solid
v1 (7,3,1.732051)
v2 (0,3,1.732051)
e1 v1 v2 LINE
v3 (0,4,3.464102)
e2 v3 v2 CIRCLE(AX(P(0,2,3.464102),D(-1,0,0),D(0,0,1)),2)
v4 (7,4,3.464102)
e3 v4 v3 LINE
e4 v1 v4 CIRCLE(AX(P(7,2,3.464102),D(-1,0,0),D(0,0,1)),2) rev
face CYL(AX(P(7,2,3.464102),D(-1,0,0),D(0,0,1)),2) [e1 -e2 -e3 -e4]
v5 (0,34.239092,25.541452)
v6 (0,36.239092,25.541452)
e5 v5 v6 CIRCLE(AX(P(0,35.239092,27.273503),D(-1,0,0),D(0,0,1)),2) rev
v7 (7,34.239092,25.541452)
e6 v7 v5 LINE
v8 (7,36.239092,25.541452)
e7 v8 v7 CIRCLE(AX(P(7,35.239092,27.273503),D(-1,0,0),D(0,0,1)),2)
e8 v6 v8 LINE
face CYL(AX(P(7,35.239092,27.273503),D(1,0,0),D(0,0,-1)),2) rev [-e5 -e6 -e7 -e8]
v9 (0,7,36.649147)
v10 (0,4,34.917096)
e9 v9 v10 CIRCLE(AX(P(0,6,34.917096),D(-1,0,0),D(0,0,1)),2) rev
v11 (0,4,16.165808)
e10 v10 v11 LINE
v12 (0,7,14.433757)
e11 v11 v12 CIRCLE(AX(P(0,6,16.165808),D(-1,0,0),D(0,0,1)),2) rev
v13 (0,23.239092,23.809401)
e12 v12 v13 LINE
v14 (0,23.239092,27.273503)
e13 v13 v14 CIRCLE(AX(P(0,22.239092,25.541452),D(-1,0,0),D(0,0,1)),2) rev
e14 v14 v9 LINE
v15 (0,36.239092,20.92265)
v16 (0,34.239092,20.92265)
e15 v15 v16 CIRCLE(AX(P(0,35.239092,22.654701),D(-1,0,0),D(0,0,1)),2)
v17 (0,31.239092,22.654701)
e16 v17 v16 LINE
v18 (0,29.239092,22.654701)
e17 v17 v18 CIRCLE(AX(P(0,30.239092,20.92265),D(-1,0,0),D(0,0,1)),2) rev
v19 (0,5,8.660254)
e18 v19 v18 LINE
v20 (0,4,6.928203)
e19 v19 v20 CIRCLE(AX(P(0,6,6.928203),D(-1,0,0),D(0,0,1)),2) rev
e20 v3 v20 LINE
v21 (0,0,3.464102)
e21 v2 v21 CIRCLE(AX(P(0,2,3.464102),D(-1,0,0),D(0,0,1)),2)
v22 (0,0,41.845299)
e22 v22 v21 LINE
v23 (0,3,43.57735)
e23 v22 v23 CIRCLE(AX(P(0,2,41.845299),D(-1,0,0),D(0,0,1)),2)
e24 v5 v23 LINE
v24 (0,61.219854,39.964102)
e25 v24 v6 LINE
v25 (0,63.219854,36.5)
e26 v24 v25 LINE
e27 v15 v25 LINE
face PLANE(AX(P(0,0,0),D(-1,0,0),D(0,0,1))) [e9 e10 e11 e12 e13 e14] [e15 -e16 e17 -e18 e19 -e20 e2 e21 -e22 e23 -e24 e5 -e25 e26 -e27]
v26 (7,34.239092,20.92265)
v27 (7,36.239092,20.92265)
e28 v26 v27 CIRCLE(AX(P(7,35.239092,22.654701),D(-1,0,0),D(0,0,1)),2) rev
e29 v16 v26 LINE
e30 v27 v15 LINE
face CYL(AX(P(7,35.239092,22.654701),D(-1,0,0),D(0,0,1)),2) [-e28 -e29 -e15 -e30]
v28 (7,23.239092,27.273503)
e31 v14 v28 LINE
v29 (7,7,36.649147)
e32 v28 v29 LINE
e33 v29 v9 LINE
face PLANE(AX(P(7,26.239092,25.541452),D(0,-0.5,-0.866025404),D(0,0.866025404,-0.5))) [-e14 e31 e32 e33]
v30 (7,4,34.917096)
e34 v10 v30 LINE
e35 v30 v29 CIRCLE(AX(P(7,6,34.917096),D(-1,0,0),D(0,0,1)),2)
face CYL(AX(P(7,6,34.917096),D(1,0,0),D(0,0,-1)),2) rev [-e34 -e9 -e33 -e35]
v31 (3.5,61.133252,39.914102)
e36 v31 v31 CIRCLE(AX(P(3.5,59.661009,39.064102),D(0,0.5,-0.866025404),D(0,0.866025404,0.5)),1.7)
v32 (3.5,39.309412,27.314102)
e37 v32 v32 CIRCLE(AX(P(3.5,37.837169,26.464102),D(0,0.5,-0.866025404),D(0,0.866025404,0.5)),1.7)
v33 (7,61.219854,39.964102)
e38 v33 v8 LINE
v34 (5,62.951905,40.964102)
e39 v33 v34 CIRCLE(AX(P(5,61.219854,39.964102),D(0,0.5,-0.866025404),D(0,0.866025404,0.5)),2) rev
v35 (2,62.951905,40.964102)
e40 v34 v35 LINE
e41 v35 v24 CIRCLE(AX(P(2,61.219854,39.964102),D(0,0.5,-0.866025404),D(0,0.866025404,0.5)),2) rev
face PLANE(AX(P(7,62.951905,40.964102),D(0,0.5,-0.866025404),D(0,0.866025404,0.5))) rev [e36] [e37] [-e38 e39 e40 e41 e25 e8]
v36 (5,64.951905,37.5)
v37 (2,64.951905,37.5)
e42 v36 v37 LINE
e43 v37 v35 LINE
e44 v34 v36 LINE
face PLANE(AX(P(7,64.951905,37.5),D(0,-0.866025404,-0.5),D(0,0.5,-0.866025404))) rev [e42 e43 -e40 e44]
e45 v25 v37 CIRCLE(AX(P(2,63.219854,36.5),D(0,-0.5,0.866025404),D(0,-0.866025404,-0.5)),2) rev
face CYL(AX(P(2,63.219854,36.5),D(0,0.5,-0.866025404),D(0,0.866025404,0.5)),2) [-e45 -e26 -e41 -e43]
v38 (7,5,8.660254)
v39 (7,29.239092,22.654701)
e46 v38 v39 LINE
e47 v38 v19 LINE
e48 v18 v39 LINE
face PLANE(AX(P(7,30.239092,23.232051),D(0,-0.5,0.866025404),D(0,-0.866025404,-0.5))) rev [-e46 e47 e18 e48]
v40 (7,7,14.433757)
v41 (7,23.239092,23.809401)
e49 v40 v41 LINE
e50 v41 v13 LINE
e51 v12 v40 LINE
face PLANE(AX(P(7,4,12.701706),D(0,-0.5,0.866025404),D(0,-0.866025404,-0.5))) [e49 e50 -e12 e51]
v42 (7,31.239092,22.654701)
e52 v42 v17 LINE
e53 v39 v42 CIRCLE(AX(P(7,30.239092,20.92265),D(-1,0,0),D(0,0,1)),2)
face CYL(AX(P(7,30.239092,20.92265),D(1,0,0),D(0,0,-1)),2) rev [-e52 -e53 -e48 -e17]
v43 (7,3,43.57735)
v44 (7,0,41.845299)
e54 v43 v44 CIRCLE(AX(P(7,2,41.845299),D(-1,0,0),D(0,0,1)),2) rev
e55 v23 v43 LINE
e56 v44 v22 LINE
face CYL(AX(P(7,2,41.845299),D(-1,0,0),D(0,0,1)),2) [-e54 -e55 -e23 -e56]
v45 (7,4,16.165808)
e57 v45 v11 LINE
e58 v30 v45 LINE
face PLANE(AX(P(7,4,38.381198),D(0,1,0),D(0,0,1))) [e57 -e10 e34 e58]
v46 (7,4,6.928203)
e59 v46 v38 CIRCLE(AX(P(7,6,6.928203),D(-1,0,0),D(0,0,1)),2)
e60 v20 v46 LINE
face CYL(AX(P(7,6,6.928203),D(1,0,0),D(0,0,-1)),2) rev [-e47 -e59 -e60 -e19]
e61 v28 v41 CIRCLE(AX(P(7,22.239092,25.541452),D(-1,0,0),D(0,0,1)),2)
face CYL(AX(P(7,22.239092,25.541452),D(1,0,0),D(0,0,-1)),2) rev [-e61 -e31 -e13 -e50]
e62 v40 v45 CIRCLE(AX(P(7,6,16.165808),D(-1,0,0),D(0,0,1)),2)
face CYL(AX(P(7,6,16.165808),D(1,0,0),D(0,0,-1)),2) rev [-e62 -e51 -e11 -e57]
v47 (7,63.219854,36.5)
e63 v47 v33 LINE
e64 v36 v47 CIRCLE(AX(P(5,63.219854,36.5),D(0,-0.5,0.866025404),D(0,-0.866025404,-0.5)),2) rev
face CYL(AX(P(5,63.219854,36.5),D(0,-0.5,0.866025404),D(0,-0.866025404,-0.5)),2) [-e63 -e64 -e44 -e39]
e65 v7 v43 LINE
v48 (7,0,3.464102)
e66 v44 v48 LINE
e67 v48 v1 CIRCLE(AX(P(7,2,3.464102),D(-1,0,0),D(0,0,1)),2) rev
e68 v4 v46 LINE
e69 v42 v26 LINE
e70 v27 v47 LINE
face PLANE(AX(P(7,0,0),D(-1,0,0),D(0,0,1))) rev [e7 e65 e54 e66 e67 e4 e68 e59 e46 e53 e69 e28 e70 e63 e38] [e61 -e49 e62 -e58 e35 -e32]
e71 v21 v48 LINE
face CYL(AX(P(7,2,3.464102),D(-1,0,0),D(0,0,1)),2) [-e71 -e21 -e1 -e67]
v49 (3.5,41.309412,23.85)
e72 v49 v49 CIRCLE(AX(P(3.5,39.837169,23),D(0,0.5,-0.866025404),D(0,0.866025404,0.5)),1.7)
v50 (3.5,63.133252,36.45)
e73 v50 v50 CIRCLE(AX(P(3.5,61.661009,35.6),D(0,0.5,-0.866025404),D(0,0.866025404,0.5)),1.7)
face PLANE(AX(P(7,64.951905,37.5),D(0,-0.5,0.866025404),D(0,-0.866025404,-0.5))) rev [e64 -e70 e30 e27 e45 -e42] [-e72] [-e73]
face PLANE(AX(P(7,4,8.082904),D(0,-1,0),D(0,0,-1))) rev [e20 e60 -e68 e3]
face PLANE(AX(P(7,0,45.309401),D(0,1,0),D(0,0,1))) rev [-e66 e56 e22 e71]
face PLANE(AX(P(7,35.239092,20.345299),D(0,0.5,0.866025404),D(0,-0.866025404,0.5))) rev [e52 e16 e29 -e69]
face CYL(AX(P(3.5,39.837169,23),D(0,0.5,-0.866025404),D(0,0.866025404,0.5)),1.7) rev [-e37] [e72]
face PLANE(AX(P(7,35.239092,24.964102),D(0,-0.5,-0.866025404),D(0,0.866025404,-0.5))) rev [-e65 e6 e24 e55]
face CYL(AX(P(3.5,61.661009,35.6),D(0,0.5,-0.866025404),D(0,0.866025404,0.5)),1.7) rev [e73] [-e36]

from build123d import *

# Parameters (mm, degrees)
BOSS_EXTRU_1_DEPTH = 7
D_GAGEMENT_M31_D   = 3.4
CONG_1_R           = 2


with BuildPart() as part:
    # Esquisse1 → Boss.-Extru.1 (new body)
    with BuildSketch(Plane(origin=(0, 0, 0), x_dir=(0, 0, -1), z_dir=(1, 0, 0))):
        Polygon((-37.5, 64.951905284), (-40.964101615, 62.951905284), (-24.964101615, 35.239092363), (-45.309401077, 0), (0, 0), (-2.309401077, 4), (-8.082903769, 4), (-23.232050808, 30.239092363), (-20.345299462, 35.239092363), align=None)
        Polygon((-38.381197846, 4), (-12.701705922, 4), (-25.541451884, 26.239092363), align=None, mode=Mode.SUBTRACT)
    extrude(amount=BOSS_EXTRU_1_DEPTH)

    # Dégagement M31 (through all)
    with Locations(Plane(origin=(0, 0, 0), x_dir=(-1, 0, 0), z_dir=(0, 0.5000000000000047, -0.866025403784436))):
        with Locations((-3.5, 71.2), (-3.5, 46)):
            Hole(D_GAGEMENT_M31_D / 2)

    # Congé1
    cong_1_edges = [part.edges().sort_by_distance(p)[0] for p in [
        (0, 63.951905284, 39.232050808),
        (3.5, 0, 0),
        (3.5, 0, 45.309401077),
        (3.5, 35.239092363, 24.964101615),
        (3.5, 35.239092363, 20.345299462),
        (3.5, 30.239092363, 23.232050808),
        (3.5, 4, 8.082903769),
        (3.5, 4, 2.309401077),
        (7, 63.951905284, 39.232050808),
        (3.5, 26.239092363, 25.541451884),
        (3.5, 4, 38.381197846),
        (3.5, 4, 12.701705922),
    ]]
    fillet(cong_1_edges, radius=CONG_1_R - 0.0001)  # a hair under: the kernel refuses the full size


solid = part.part
